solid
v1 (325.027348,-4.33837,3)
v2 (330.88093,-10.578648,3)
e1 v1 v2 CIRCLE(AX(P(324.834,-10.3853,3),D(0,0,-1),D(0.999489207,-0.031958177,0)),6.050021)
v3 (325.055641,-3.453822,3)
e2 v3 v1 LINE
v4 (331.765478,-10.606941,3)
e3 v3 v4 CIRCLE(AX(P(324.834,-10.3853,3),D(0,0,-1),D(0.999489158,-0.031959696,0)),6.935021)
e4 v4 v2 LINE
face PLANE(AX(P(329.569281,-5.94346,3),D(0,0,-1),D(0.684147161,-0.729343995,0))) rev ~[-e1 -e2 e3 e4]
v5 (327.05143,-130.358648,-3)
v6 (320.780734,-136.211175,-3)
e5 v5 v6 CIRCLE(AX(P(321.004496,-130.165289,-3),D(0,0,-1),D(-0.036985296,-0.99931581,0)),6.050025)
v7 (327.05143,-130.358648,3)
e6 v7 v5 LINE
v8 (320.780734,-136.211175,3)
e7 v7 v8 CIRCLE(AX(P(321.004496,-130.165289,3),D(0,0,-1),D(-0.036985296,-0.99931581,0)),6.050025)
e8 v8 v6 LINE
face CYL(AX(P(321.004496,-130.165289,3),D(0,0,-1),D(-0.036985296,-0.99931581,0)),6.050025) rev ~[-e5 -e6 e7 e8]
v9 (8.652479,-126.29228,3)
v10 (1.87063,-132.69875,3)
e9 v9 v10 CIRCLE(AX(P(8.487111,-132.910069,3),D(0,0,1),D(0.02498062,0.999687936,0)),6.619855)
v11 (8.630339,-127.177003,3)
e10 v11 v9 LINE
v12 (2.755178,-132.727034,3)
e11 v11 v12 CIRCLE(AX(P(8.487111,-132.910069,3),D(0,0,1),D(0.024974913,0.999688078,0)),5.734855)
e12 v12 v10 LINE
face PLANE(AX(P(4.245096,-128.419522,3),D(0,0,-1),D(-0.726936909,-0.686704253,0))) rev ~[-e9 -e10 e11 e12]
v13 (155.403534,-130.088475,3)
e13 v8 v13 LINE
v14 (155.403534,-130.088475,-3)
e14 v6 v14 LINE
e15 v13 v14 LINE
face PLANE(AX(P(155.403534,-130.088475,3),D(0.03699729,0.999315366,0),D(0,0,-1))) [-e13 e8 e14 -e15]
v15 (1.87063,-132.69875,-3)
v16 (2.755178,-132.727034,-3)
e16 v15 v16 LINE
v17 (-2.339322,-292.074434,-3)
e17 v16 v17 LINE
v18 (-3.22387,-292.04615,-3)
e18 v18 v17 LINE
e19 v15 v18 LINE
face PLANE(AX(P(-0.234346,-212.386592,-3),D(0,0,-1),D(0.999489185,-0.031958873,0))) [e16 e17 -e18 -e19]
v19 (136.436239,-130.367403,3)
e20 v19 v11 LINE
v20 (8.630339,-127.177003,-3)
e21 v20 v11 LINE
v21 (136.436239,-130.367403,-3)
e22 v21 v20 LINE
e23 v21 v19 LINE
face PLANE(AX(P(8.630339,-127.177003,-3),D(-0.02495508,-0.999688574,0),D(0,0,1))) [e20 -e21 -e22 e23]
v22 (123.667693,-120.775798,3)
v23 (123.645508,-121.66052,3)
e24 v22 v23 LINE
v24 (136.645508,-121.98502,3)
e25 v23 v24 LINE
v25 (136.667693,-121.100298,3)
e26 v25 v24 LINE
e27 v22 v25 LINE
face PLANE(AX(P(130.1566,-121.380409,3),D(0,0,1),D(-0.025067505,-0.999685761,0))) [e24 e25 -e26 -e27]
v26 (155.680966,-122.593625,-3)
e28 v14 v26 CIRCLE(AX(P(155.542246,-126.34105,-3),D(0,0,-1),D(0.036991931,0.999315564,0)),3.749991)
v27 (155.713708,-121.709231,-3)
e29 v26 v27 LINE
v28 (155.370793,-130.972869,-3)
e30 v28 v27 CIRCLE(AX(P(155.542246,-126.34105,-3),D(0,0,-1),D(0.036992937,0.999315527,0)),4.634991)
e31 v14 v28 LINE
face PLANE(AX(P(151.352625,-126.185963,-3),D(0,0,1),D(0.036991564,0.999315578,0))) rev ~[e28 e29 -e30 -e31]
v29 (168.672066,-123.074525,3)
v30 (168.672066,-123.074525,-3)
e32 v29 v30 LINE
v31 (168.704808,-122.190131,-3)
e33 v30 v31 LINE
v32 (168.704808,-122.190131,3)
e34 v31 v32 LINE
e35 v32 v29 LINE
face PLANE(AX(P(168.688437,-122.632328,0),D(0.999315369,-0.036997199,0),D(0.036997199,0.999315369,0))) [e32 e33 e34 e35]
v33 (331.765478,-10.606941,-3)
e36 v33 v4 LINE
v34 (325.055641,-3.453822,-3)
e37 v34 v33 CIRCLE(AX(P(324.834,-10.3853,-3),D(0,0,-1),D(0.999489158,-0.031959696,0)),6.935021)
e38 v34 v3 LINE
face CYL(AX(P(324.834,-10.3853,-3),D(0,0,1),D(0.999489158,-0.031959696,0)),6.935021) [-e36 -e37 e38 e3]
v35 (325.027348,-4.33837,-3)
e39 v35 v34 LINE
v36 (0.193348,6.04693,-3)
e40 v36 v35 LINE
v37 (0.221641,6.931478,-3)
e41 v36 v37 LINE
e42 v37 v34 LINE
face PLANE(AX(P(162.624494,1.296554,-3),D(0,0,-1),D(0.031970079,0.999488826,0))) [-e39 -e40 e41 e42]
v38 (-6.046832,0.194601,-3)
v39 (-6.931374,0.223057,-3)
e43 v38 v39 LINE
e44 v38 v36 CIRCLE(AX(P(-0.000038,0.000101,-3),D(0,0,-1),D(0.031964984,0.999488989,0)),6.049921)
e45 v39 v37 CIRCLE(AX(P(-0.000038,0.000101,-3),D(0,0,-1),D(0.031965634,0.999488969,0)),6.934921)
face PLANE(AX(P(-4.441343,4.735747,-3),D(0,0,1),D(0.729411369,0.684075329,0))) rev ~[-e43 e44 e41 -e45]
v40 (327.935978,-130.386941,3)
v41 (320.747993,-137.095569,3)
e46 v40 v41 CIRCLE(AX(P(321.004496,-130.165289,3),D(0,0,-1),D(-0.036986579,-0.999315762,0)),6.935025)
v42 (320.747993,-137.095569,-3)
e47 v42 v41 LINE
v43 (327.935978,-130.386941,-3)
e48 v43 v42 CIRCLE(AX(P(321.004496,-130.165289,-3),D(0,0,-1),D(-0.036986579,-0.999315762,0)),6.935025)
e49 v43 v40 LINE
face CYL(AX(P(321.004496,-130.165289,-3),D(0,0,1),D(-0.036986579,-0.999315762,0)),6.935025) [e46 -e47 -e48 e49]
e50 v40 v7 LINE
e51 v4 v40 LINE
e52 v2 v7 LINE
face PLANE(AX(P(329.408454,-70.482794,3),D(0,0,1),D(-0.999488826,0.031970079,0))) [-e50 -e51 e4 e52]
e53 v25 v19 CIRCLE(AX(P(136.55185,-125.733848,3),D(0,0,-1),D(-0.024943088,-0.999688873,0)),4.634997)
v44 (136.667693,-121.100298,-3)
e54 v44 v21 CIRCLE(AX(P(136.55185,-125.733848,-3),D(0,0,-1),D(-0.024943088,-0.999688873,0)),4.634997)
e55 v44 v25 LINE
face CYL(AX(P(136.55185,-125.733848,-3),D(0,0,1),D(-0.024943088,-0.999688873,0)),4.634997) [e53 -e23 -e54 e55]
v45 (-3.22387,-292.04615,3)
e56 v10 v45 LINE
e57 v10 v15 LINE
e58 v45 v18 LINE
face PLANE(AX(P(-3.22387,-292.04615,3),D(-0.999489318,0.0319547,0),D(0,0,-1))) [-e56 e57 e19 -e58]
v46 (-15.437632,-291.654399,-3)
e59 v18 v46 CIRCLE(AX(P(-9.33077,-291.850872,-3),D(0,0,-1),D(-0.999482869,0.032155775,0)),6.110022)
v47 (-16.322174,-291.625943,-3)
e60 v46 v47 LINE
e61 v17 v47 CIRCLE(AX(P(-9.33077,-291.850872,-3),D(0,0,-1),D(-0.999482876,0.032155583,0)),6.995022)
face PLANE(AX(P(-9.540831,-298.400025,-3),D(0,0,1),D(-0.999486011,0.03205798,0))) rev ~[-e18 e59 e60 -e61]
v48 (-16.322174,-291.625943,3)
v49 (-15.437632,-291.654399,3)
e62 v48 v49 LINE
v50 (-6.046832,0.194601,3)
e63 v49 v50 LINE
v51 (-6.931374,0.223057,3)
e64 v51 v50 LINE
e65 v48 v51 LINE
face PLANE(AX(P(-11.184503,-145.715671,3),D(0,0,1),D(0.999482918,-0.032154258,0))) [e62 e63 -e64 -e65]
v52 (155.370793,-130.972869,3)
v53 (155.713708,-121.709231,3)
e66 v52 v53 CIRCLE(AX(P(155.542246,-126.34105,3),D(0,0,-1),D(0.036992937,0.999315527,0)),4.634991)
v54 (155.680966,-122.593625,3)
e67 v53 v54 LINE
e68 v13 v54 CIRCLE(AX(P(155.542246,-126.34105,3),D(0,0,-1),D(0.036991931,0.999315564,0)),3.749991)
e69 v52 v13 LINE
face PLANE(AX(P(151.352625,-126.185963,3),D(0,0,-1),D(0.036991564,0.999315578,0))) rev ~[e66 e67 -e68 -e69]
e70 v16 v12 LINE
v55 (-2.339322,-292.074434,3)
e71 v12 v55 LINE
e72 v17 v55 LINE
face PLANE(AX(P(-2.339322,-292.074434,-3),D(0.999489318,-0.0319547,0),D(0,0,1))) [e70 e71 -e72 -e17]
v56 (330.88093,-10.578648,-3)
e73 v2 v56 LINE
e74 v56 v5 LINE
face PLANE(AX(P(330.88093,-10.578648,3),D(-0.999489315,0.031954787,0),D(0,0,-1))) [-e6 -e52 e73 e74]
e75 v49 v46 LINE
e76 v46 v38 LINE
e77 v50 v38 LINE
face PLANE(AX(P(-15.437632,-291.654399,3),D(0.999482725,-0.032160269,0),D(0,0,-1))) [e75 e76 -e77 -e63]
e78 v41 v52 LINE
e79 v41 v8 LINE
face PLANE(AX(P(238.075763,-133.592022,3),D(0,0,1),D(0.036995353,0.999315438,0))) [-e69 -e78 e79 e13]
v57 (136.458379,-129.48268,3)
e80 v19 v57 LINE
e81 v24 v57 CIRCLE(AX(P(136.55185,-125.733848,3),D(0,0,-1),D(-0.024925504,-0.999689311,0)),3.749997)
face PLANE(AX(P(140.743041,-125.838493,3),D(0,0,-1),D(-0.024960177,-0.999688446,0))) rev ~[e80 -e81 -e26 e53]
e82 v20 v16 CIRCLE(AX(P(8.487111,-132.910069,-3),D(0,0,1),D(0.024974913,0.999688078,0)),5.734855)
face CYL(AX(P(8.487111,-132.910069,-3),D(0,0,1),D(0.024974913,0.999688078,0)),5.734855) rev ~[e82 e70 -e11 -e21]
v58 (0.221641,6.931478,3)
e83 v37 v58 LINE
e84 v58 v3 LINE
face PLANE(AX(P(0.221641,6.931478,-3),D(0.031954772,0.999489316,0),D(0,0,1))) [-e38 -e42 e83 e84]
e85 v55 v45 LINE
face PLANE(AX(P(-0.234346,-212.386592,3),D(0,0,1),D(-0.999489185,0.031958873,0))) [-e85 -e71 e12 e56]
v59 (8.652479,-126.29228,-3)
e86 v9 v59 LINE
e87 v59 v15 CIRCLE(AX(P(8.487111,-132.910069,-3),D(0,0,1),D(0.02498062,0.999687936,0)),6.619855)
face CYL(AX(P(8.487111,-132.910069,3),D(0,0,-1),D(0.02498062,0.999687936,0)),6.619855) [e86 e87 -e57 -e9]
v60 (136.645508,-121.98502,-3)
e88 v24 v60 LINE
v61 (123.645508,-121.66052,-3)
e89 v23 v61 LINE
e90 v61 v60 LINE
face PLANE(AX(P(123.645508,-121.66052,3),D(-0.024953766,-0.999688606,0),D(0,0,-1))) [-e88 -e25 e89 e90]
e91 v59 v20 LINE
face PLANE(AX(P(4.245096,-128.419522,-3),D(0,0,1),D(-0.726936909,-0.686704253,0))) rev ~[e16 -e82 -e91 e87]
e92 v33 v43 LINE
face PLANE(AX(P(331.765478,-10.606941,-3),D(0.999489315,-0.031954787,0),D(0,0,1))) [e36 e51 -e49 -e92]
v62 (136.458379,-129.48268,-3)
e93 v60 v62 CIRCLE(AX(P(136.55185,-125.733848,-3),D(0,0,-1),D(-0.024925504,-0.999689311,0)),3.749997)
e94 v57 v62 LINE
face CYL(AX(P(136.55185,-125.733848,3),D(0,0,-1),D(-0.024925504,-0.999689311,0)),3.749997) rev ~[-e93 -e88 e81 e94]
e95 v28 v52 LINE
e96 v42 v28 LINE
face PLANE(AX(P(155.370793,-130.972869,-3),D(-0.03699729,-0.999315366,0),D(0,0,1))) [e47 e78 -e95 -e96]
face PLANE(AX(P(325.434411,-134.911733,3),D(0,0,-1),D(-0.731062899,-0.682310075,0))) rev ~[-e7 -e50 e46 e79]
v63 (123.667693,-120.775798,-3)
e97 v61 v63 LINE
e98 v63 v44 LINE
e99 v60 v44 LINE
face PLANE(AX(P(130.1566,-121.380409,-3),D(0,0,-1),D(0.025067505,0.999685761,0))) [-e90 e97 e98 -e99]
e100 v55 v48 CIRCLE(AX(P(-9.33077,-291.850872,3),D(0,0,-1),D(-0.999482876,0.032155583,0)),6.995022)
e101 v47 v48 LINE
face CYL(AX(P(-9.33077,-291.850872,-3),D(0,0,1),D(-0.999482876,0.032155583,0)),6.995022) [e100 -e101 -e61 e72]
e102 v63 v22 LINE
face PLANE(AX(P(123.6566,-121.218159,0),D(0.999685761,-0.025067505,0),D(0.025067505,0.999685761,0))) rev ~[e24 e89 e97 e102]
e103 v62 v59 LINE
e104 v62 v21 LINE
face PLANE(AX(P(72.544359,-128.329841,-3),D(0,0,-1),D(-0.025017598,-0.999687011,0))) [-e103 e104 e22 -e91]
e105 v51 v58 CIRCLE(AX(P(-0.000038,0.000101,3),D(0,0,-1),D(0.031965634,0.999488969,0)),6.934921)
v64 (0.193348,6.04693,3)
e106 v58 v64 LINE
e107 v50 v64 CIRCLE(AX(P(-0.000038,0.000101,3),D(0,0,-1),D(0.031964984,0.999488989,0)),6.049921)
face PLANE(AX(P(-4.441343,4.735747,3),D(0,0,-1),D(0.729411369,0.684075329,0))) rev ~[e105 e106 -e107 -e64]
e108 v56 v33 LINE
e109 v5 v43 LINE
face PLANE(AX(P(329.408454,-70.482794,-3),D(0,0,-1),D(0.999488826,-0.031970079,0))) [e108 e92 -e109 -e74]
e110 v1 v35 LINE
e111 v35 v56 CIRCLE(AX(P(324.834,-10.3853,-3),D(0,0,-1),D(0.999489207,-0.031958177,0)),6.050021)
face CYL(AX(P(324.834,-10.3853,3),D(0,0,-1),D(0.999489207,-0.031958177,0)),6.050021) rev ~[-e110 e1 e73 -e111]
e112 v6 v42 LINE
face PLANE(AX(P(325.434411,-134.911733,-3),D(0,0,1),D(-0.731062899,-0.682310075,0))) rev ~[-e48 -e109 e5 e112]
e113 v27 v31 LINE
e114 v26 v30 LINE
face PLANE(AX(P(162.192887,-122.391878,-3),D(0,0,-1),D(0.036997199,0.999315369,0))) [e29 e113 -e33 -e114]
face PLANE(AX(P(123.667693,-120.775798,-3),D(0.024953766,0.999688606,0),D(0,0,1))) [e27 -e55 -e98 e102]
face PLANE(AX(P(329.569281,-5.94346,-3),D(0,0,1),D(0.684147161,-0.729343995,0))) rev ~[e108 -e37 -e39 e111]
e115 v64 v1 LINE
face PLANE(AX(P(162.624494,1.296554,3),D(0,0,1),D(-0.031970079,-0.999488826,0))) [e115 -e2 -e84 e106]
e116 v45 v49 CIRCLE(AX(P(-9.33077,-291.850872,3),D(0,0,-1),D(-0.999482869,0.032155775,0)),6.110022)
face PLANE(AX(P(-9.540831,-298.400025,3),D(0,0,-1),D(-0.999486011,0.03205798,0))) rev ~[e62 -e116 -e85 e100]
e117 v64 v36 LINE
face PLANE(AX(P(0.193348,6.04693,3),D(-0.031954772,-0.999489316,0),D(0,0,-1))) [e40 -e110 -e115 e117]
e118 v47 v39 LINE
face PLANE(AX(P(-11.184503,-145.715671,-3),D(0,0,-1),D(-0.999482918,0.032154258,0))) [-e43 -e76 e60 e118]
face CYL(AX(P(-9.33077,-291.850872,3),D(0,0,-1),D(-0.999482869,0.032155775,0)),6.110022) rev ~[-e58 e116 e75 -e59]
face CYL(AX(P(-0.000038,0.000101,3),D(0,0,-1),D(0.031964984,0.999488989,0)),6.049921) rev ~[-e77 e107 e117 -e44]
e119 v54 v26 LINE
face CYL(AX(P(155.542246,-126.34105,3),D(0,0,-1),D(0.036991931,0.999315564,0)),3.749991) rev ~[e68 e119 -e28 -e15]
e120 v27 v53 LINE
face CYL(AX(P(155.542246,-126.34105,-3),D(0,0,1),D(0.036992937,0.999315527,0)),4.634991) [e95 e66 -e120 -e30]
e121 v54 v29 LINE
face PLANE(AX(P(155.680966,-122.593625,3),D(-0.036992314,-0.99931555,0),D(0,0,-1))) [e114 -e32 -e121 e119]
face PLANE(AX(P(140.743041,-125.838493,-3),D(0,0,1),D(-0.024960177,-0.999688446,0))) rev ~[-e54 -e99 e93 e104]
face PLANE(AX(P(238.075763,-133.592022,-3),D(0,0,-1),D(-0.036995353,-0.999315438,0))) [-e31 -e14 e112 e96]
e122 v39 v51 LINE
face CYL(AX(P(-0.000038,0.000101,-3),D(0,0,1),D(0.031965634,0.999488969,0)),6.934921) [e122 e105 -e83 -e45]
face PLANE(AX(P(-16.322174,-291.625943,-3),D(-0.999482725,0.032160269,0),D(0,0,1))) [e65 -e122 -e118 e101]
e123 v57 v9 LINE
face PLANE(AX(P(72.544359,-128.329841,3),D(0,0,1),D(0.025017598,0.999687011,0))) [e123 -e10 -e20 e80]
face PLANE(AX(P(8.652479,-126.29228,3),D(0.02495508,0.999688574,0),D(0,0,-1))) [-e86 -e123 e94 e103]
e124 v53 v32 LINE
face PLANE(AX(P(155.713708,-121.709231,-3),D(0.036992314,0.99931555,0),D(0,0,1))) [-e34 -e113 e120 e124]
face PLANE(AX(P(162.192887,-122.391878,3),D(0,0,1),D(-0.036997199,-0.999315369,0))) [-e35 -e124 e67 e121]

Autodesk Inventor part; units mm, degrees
ref_plane "YZ Plane" through (0, 0, 0) normal (1, 0, 0) x (0, 1, 0)
ref_plane "XZ Plane" through (0, 0, 0) normal (0, 1, 0) x (-1, 0, 0)
sketch "Sketch1" plane through (0, 0, 0) normal (0, 0, 1) x (1, 0, 0)
  circle A0 centre (0, 0) radius 6.05
surface extrude "ExtrusionSrf1" sketch "Sketch1" along normal mid plane 6 shown yes curves A0
sketch "Sketch2" plane through (0, 0, 0) normal (0, 0, 1) x (1, 0, 0)
  circle A0 centre (324.834, -10.3853) radius 6.05
  point P0 (0, 0)
surface extrude "ExtrusionSrf2" sketch "Sketch2" along normal mid plane 6 shown yes curves A0
sketch "Sketch3" plane through (0, 0, 0) normal (0, 0, 1) x (1, 0, 0)
  circle A0 centre (-9.3308, -291.8509) radius 6.11
  point P0 (0, 0)
surface extrude "ExtrusionSrf3" sketch "Sketch3" along normal blind 6 shown yes curves A0
sketch "Sketch4" plane through (0, 0, 0) normal (0, 0, 1) x (1, 0, 0)
  circle A0 centre (8.4872, -132.9103) radius 5.735
  point P0 (0, 0)
surface extrude "ExtrusionSrf4" sketch "Sketch4" along normal mid plane 6 shown yes curves A0
sketch "Sketch5" plane through (0, 0, 0) normal (0, 0, 1) x (1, 0, 0)
  circle A0 centre (321.0045, -130.1653) radius 6.05
  point P0 (0, 0)
surface extrude "ExtrusionSrf5" sketch "Sketch5" along normal mid plane 6 shown yes curves A0
sketch "Sketch6" plane through (0, 0, 0) normal (0, 0, 1) x (1, 0, 0)
  circle A0 centre (136.5519, -125.7339) radius 3
  point P0 (0, 0)
surface extrude "ExtrusionSrf6" sketch "Sketch6" along normal mid plane 6 shown yes curves A0
sketch "Sketch7" plane through (0, 0, 0) normal (0, 0, 1) x (1, 0, 0)
  circle A0 centre (155.5422, -126.341) radius 3
  point P0 (0, 0)
surface extrude "ExtrusionSrf7" sketch "Sketch7" along normal mid plane 6 shown yes curves A0
sketch "Sketch8" plane through (0, 0, 0) normal (0, 0, 1) x (1, 0, 0)
  circle A0 centre (0, 0) radius 6.05 projected
  circle A1 centre (8.4872, -132.9103) radius 5.735 projected
  circle A2 centre (-9.3308, -291.8509) radius 6.11 projected
  circle A3 centre (136.5519, -125.7339) radius 3 projected
  circle A4 centre (155.5422, -126.341) radius 3 projected
  circle A5 centre (321.0045, -130.1653) radius 6.05 projected
  circle A6 centre (324.834, -10.3853) radius 6.05 projected
  arc A7 (0.2015, 6.3018) -> (-6.3017, 0.2028) centre (0, 0) ccw
  arc A8 (-15.6925, -291.6462) -> (-2.969, -292.0543) centre (-9.3308, -291.8509) ccw
  arc A9 (8.6461, -126.5472) -> (2.1255, -132.7069) centre (8.4872, -132.9103) ccw
  arc A10 (136.452, -129.7376) -> (136.6519, -121.7301) centre (136.5519, -125.7339) ccw
  arc A11 (331.1358, -10.5868) -> (325.0355, -4.0835) centre (324.834, -10.3853) ccw
  arc A12 (155.6904, -122.3388) -> (155.3941, -130.3433) centre (155.5422, -126.341) ccw
  arc A13 (320.7713, -136.466) -> (327.3063, -130.3668) centre (321.0045, -130.1653) ccw
  line L0 (-15.6925, -291.6462) -> (-6.3017, 0.2028)
  line L1 (0.2015, 6.3018) -> (325.0355, -4.0835)
  line L2 (-2.969, -292.0543) -> (2.1255, -132.7069)
  line L3 (8.6461, -126.5472) -> (136.452, -129.7376)
  line L4 (331.1358, -10.5868) -> (327.3063, -130.3668)
  line L5 (123.6519, -121.4056) -> (136.6519, -121.7301)
  line L6 (155.3941, -130.3433) -> (320.7713, -136.466)
  line L7 (155.6904, -122.3388) -> (168.6815, -122.8197)
  dimension "d14" = 0.255
  dimension "d15" = 0.255
  dimension "d16" = 0.255
  dimension "d17" = 0.63
  dimension "d19" = 0.255
  dimension "d22" = 1.005
  dimension "d23" = 1.005
  dimension "d34" = 13
  dimension "d35" = 13
ref_plane "Work Plane2" through (168.6815, -122.8197, 0) normal (0.9993154, -0.0369972, 0) x (0.0369972, 0.9993154, 0)
sketch "Sketch10" plane through (168.6815, -122.8197, 0) normal (0.9993154, -0.0369972, 0) x (0.0369972, 0.9993154, 0)
  line L0 (0.63, 3) -> (-0.255, 3)
  line L1 (-0.255, 3) -> (-0.255, -3)
  line L2 (-0.255, -3) -> (0.63, -3)
  line L3 (0.63, -3) -> (0.63, 3)
  line L4 (0.63, 0) -> (-0.255, 0) construction
  point P0 (116.4949, 0)
  point P1 (0, 0)
  dimension "d29" = 6
  dimension "d30" = 0.63
  dimension "d31" = 0.255
sweep "Sweep2" add profiles "Sketch10" path "Sketch8" path curves L7 A12 L6 A13 L4 A11 L1 A7 L0 A8 L2 A9 L3 A10 L5
equation "\"d14\" = inside"
equation "\"d15\" = inside"
equation "\"d16\" = inside"
equation "\"d17\" = backside"
equation "\"d19\" = inside"
equation "\"d30\" = backside"
equation "\"d31\" = inside"
equation "\"inside\" = 0.255"
equation "\"backside\" = 0.63"
properties part number "Belt 3" material "Rubber"
